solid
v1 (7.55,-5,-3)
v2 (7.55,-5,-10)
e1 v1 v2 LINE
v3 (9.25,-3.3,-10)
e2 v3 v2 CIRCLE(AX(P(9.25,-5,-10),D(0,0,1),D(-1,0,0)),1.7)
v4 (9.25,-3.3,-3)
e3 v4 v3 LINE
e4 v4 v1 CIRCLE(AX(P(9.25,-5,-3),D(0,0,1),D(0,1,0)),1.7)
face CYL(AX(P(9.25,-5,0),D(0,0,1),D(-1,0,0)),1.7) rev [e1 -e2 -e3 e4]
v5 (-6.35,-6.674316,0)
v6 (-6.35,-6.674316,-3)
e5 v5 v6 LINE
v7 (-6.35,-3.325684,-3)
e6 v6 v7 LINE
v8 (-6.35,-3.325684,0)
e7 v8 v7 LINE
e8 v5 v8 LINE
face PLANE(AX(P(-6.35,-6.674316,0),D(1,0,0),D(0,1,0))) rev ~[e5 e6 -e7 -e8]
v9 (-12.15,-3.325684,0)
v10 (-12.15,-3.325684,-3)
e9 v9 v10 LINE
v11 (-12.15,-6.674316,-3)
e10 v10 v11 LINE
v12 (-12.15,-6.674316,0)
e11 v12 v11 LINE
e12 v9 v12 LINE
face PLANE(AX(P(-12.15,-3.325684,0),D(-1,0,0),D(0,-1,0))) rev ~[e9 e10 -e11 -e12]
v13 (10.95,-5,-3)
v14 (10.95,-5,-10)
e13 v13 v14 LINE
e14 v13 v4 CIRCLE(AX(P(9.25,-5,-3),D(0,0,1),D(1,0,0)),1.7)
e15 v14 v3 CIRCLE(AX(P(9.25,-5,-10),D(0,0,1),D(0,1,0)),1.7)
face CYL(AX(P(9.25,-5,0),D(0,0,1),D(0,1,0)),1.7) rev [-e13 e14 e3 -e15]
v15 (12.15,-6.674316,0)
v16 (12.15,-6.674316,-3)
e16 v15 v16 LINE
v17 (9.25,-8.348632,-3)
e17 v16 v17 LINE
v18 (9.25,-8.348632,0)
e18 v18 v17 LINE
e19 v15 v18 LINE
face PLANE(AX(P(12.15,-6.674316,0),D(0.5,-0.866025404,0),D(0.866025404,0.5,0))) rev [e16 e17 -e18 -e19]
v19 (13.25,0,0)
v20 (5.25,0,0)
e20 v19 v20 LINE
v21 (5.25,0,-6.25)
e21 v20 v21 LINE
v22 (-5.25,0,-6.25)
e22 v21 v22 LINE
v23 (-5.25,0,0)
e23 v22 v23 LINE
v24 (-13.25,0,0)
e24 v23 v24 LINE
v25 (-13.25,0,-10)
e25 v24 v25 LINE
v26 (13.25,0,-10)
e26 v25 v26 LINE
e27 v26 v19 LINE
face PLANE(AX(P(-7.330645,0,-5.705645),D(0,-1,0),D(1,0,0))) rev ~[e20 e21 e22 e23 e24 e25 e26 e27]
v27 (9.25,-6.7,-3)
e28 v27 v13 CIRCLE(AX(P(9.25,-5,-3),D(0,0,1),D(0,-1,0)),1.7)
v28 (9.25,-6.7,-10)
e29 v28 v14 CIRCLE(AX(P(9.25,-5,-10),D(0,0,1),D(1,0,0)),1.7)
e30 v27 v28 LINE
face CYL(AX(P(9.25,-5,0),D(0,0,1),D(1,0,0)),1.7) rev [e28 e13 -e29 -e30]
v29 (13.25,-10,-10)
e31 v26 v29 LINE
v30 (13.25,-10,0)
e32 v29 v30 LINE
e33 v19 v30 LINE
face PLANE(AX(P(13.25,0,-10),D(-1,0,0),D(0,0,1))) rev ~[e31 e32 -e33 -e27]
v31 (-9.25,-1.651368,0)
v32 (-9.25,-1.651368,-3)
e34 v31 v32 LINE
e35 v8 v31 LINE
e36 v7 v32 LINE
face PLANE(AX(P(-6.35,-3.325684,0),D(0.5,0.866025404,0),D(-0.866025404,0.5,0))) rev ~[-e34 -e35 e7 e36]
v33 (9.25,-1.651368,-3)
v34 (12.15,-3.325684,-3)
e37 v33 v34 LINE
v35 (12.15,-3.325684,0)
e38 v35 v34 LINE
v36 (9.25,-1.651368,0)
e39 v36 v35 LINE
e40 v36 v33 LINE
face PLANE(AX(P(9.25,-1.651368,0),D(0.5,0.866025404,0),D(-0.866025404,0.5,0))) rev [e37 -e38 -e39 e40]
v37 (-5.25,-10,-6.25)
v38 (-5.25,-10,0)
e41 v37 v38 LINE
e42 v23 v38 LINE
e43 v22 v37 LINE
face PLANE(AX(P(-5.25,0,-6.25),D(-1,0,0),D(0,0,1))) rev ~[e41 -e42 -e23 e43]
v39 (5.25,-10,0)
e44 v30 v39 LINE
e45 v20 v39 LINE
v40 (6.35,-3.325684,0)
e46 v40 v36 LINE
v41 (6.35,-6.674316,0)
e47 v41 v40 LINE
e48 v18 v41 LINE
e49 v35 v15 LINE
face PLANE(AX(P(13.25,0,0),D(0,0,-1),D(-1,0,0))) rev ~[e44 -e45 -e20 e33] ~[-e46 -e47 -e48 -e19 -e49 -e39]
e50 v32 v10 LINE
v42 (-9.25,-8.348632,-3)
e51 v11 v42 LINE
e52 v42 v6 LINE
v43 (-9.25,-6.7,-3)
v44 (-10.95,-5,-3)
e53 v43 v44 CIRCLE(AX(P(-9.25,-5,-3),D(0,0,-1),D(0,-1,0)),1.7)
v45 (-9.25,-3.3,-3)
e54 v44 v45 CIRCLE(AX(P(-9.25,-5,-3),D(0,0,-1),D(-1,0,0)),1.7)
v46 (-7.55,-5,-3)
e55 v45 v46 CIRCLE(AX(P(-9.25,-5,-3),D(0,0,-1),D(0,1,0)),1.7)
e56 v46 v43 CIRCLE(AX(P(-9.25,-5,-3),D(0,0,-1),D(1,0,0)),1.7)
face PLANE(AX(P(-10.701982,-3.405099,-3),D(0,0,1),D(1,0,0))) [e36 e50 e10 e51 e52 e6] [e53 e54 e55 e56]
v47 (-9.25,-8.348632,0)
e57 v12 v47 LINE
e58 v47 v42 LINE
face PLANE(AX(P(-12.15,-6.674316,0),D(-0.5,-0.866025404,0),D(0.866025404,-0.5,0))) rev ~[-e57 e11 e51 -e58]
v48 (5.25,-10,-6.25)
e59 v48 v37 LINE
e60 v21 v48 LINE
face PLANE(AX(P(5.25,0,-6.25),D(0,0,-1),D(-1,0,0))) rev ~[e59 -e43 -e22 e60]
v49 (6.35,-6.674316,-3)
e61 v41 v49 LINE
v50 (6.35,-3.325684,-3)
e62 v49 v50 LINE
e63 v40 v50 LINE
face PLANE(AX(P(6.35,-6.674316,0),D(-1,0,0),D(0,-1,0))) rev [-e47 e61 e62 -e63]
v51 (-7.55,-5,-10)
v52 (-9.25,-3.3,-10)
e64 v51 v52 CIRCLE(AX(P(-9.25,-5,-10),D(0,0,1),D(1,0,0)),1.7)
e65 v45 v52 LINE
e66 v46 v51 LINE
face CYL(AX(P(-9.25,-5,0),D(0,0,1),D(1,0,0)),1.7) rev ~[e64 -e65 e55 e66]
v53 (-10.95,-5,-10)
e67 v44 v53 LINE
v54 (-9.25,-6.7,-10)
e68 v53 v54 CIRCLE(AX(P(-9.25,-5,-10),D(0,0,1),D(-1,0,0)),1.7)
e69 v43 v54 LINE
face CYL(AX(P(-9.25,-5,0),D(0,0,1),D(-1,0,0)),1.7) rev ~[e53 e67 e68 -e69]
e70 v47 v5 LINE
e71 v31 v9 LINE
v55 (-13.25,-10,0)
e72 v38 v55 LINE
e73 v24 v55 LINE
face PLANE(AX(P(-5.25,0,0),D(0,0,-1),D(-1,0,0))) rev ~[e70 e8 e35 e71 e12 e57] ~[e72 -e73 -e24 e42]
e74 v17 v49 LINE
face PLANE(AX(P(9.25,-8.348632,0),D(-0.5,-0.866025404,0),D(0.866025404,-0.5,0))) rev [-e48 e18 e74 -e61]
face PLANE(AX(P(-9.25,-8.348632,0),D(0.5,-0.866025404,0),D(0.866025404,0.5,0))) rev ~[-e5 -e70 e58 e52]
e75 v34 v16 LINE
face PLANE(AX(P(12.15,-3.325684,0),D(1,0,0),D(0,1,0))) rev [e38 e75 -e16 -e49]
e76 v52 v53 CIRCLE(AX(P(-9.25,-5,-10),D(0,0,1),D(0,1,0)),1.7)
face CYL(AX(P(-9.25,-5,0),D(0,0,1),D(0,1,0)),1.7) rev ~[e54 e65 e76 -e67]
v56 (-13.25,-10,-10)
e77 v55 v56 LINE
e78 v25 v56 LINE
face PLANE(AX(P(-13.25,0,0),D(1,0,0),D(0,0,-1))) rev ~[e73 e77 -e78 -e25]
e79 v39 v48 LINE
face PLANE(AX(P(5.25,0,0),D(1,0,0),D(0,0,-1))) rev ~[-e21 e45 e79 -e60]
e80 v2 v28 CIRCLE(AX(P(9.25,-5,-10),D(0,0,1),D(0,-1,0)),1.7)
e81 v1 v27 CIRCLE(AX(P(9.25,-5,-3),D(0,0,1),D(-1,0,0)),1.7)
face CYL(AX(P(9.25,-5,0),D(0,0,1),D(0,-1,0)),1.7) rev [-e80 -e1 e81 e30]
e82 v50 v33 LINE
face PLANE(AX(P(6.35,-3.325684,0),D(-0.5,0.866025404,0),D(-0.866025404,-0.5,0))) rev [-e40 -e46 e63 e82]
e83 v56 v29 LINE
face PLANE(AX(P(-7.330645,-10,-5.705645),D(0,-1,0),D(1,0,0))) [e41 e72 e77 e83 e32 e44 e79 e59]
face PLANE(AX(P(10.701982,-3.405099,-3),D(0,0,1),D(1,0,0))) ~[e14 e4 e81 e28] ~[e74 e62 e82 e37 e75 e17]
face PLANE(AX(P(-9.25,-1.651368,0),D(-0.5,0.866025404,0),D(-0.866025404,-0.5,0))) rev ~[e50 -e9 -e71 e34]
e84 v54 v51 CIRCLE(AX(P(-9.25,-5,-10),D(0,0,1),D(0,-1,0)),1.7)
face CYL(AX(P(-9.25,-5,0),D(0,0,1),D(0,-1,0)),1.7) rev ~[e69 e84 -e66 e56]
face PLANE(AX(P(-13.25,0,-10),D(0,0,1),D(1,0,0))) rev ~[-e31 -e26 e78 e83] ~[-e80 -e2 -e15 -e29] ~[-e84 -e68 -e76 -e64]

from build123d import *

# Parameters (mm, degrees)
F1_DEPTH = 10
F3_DEPTH = 10.001
F4_DEPTH = 3


# Not quite as in the source:
# - a pattern or mirror of a feature is missing from the dataset's text; its kind, count and spacing are read off the source's solid


with BuildPart() as f1:
    # F0 (on Front) → F1 (new body)
    with BuildSketch(Plane.XZ):
        Polygon((0, -10), (0, -6.25), (-5.25, -6.25), (-5.25, 0), (-13.25, 0), (-13.25, -10), align=None)
        Polygon((5.25, -6.25), (0, -6.25), (0, -10), (13.25, -10), (13.25, 0), (5.25, 0), align=None)
    extrude(amount=F1_DEPTH)

    # F2 (on face) → F3 (cut, through all)
    with BuildSketch(Plane.XY):
        with BuildLine():
            ThreePointArc((-9.25, -3.3), (-10.452081528, -3.797918472), (-10.95, -5))
            Line((-10.95, -5), (-9.25, -5))
            Line((-9.25, -5), (-9.25, -3.3))
        make_face()
        with BuildLine():
            Line((-9.25, -3.3), (-9.25, -5))
            Line((-9.25, -5), (-7.55, -5))
            ThreePointArc((-7.55, -5), (-8.047918472, -3.797918472), (-9.25, -3.3))
        make_face()
        with BuildLine():
            Line((-7.55, -5), (-9.25, -5))
            Line((-9.25, -5), (-9.25, -6.7))
            ThreePointArc((-9.25, -6.7), (-8.047918472, -6.202081528), (-7.55, -5))
        make_face()
        with BuildLine():
            Line((-9.25, -5), (-10.95, -5))
            ThreePointArc((-10.95, -5), (-10.452081528, -6.202081528), (-9.25, -6.7))
            Line((-9.25, -6.7), (-9.25, -5))
        make_face()
    f3 = extrude(amount=-F3_DEPTH, mode=Mode.SUBTRACT)

    # F3_copies: F3 across plane
    add(f3.mirror(Plane(origin=(0, 0, 0), x_dir=(0, 0, 1), z_dir=(1, 0, 0))), mode=Mode.SUBTRACT)

    # F2 (on face) → F4 (cut)
    with BuildSketch(Plane.XY):
        with BuildLine():
            Line((-12.15, -3.3256842194), (-12.15, -5))
            Line((-12.15, -5), (-10.95, -5))
            ThreePointArc((-10.95, -5), (-10.452081528, -3.797918472), (-9.25, -3.3))
            Line((-9.25, -3.3), (-9.25, -1.6513684387))
            Line((-9.25, -1.6513684387), (-12.15, -3.3256842194))
        make_face()
        with BuildLine():
            Line((-10.95, -5), (-12.15, -5))
            Line((-12.15, -5), (-12.15, -6.6743157806))
            Line((-12.15, -6.6743157806), (-9.25, -8.3486315613))
            Line((-9.25, -8.3486315613), (-9.25, -6.7))
            ThreePointArc((-9.25, -6.7), (-10.452081528, -6.202081528), (-10.95, -5))
        make_face()
        with BuildLine():
            Line((-9.25, -1.6513684387), (-9.25, -3.3))
            ThreePointArc((-9.25, -3.3), (-8.047918472, -3.797918472), (-7.55, -5))
            Line((-7.55, -5), (-6.35, -5))
            Line((-6.35, -5), (-6.35, -3.3256842194))
            Line((-6.35, -3.3256842194), (-9.25, -1.6513684387))
        make_face()
        with BuildLine():
            ThreePointArc((-7.55, -5), (-8.047918472, -6.202081528), (-9.25, -6.7))
            Line((-9.25, -6.7), (-9.25, -8.3486315613))
            Line((-9.25, -8.3486315613), (-6.35, -6.6743157806))
            Line((-6.35, -6.6743157806), (-6.35, -5))
            Line((-6.35, -5), (-7.55, -5))
        make_face()
    f4 = extrude(amount=-F4_DEPTH, mode=Mode.SUBTRACT)

    # F4_copies: F4 across plane
    add(f4.mirror(Plane(origin=(0, 0, 0), x_dir=(0, 0, 1), z_dir=(1, 0, 0))), mode=Mode.SUBTRACT)


solid = f1.part
